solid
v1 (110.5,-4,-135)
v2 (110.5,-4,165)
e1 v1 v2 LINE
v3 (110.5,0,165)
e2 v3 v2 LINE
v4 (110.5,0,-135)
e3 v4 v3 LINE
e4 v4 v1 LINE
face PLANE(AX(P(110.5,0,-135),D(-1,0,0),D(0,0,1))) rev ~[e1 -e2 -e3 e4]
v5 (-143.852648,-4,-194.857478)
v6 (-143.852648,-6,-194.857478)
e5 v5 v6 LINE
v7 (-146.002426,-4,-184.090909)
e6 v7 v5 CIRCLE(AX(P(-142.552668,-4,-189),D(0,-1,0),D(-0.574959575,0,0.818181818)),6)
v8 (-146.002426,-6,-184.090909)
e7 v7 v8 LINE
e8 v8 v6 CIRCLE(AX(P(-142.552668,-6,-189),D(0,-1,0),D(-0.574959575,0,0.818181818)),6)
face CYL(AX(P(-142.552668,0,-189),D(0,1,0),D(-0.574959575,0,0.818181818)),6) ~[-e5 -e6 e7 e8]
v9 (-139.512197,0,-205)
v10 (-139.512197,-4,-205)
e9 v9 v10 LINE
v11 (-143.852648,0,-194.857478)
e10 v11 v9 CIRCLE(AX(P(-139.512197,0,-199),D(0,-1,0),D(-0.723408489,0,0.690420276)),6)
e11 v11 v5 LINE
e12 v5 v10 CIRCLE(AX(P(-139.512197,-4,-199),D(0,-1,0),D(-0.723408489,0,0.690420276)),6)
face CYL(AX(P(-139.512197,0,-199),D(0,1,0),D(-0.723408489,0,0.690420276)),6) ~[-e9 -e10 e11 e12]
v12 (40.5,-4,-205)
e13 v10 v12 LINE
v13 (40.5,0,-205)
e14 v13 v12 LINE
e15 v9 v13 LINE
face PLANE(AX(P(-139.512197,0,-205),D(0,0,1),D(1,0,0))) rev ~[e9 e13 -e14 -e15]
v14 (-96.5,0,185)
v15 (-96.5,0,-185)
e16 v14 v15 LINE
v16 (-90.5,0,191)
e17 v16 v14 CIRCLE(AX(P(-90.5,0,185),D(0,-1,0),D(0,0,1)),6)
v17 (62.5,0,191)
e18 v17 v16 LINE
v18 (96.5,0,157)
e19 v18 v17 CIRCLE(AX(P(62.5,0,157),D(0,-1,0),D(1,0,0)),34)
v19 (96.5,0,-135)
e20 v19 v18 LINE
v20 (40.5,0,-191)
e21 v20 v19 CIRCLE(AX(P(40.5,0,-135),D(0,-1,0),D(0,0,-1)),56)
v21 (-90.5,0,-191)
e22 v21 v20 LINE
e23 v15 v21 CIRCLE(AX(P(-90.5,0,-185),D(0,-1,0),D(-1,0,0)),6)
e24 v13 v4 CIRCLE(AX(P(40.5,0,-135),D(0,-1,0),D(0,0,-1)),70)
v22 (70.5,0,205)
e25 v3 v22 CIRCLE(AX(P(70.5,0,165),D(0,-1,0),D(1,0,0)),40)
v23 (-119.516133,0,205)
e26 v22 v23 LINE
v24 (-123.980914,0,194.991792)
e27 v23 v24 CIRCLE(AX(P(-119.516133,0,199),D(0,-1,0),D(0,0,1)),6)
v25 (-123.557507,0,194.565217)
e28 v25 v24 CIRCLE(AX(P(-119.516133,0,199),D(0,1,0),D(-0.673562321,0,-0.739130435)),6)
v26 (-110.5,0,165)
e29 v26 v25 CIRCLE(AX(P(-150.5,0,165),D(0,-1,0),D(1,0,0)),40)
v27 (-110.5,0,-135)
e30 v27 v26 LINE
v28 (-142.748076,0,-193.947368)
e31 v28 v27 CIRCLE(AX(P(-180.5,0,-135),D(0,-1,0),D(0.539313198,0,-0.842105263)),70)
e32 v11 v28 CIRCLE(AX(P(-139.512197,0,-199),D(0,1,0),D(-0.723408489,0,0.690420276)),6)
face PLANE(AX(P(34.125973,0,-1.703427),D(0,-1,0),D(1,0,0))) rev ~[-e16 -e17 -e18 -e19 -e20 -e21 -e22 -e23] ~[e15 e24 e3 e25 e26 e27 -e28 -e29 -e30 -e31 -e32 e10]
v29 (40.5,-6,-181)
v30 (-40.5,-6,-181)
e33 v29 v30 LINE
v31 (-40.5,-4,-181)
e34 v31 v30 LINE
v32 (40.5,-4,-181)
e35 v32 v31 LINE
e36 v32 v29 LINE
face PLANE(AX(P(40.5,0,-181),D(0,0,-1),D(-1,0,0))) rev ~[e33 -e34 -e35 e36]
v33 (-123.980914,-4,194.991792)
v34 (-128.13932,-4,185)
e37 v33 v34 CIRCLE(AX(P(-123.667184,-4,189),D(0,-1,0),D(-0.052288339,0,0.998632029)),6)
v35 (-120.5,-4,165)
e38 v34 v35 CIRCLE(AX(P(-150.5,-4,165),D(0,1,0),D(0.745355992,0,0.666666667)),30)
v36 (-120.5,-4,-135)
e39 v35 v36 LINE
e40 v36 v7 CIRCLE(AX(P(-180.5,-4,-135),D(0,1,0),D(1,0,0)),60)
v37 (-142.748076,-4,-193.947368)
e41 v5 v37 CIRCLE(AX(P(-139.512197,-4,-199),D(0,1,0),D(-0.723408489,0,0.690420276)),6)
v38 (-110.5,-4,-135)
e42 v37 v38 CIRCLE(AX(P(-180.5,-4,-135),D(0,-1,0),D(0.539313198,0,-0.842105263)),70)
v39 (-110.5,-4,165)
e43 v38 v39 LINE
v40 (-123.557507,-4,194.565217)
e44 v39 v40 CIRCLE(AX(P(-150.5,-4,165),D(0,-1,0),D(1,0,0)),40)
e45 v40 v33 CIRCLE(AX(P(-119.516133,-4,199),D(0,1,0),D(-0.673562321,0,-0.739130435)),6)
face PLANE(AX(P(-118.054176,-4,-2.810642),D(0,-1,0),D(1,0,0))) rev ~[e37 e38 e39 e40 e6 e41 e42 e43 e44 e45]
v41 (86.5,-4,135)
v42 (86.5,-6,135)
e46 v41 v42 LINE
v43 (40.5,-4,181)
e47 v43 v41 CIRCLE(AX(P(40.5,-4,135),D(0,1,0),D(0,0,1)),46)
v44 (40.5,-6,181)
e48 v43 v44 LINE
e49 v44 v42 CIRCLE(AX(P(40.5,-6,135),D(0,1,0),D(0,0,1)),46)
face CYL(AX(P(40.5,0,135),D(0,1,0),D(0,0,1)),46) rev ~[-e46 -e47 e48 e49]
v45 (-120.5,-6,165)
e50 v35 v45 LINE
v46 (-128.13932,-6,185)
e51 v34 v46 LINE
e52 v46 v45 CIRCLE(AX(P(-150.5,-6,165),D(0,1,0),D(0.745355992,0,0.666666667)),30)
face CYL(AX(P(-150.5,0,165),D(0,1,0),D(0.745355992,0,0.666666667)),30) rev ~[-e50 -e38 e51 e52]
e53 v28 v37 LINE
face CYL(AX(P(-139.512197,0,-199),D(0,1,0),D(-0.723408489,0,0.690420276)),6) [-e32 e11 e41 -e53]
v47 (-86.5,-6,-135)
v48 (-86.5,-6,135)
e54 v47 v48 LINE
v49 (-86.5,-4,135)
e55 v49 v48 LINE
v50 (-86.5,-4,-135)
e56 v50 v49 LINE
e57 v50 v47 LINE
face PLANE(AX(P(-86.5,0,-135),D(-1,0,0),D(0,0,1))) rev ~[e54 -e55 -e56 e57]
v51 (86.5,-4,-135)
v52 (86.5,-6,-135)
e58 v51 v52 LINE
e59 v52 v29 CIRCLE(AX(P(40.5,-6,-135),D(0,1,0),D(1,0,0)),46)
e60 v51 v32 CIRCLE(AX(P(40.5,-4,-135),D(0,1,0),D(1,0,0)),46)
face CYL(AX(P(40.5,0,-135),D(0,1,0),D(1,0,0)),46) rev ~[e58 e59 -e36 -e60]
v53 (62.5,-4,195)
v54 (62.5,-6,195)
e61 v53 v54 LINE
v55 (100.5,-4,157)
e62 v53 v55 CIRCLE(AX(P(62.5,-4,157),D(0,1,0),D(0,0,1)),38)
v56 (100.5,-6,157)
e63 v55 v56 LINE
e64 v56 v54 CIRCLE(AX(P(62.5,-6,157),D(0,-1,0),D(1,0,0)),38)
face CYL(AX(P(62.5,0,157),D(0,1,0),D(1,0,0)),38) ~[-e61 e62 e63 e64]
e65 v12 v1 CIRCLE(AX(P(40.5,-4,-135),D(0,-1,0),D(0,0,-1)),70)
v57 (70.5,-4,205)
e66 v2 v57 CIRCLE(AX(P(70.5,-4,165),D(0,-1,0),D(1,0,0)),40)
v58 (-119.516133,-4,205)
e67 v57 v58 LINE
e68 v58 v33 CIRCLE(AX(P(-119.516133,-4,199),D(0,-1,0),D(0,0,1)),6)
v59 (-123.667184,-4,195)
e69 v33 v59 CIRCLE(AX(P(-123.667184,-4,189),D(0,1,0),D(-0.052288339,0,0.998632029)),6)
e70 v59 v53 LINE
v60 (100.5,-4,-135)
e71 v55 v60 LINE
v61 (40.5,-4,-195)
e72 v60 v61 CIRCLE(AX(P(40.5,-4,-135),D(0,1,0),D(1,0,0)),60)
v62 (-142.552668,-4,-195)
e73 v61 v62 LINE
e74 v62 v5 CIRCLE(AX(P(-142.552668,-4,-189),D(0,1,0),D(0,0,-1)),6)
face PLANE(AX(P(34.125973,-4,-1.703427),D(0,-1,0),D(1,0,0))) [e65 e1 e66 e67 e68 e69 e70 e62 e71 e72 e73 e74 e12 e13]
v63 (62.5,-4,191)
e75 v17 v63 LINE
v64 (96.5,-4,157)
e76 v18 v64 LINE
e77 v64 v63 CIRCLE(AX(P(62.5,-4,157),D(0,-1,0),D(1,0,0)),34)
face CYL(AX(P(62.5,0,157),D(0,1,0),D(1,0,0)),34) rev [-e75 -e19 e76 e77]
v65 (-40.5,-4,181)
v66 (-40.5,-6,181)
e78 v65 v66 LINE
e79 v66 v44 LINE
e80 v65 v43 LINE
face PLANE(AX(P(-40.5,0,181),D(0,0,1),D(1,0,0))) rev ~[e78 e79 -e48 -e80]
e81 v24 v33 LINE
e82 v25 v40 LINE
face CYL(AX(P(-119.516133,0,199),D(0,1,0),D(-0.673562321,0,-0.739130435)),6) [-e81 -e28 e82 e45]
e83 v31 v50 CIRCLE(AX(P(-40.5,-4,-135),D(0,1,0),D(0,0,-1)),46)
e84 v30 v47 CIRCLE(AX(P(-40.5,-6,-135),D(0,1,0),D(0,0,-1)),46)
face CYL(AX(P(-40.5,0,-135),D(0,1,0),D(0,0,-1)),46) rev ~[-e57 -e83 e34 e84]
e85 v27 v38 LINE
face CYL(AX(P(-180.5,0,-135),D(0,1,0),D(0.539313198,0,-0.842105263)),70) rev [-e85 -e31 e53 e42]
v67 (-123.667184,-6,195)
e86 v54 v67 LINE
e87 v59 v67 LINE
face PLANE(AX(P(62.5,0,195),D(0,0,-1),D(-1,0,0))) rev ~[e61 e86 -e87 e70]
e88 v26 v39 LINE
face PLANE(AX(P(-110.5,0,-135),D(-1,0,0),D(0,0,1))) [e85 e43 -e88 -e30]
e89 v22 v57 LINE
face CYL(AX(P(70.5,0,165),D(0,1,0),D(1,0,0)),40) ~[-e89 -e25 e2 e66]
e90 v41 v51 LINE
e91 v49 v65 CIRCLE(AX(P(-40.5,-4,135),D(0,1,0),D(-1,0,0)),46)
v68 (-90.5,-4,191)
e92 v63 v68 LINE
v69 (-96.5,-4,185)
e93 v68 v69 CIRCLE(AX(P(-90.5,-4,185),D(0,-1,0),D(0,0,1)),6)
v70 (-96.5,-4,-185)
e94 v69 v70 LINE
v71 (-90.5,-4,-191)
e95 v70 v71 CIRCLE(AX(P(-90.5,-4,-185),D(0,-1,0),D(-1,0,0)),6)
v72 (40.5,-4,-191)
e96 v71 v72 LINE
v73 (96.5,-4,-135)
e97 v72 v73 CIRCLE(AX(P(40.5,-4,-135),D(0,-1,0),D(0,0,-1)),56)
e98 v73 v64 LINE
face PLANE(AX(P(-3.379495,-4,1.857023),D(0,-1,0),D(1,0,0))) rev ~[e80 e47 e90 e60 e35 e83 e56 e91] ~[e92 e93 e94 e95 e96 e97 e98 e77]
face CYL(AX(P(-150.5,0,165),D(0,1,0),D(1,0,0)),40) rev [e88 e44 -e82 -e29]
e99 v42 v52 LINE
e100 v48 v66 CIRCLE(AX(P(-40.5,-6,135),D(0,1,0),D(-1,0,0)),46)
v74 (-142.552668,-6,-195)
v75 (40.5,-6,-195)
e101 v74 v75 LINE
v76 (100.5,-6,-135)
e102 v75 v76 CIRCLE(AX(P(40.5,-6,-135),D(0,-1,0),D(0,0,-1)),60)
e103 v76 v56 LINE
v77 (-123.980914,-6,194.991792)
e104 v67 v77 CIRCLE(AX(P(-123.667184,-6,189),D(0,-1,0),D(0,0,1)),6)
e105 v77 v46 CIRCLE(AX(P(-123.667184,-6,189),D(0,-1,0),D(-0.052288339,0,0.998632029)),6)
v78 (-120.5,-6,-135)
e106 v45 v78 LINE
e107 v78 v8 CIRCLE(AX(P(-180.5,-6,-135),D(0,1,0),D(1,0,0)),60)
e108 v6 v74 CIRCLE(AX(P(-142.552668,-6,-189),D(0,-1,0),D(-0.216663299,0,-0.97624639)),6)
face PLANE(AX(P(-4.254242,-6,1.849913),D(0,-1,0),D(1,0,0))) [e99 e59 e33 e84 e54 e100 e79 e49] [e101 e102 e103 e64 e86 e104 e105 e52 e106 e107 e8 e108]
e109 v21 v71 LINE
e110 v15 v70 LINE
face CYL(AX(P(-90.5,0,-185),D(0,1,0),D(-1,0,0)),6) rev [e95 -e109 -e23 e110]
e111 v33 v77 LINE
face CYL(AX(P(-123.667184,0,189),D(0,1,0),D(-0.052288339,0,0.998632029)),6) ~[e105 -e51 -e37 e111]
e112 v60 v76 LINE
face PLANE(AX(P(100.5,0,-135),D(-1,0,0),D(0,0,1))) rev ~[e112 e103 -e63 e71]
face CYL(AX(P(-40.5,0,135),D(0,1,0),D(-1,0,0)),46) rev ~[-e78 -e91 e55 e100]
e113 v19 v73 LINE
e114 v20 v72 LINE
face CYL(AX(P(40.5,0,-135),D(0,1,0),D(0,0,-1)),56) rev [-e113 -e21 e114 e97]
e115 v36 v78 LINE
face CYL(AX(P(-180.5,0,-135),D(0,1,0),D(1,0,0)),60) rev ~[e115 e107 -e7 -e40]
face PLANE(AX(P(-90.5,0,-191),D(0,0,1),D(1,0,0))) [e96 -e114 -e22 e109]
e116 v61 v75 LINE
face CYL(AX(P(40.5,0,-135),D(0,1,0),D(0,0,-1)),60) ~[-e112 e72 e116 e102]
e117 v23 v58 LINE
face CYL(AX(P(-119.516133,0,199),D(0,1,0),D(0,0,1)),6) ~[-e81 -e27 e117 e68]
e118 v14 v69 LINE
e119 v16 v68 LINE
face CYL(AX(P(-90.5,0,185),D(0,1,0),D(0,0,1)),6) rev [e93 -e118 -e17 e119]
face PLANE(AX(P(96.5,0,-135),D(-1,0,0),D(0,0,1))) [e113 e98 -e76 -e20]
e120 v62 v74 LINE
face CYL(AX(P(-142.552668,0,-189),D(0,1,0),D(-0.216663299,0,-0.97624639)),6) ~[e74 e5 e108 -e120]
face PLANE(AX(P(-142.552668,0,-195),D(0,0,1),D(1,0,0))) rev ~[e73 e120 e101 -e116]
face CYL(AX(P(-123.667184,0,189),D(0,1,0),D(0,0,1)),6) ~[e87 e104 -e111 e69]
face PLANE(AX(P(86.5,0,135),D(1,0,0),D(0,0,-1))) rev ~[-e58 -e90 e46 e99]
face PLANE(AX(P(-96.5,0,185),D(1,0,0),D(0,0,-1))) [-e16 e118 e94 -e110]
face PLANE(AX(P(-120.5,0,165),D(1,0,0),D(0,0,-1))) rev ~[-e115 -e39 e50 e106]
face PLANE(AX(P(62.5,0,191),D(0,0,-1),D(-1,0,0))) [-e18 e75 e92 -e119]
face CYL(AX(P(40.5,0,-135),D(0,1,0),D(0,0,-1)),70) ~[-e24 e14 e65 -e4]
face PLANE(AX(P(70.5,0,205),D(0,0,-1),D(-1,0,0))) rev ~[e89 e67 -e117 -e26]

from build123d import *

# Parameters (mm, degrees)
F1_DEPTH = 6
F2_DEPTH = 4
F3_DEPTH = 4
F4_DEPTH = 4


# Not quite as in the source:
# - a feature names something its author has since deleted; it is built from what else it names


with BuildPart() as f1:
    # F0 (on Front) → F1 (new body)
    with BuildSketch(Plane.XZ):
        with BuildLine():
            Line((-100.5, 195), (-100.5, -195))
            Line((-100.5, -195), (-40.5, -195))
            Line((-40.5, -195), (40.5, -195))
            ThreePointArc((40.5, -195), (82.9264068712, -177.4264068712), (100.5, -135))
            Line((100.5, -135), (100.5, 157))
            ThreePointArc((100.5, 157), (89.3700576851, 183.8700576851), (62.5, 195))
            Line((62.5, 195), (-100.5, 195))
        make_face()
        with BuildLine():
            Line((96.5, 157), (96.5, -135))
            ThreePointArc((96.5, -135), (80.0979797464, -174.5979797464), (40.5, -191))
            Line((40.5, -191), (-90.5, -191))
            ThreePointArc((-90.5, -191), (-94.7426406871, -189.2426406871), (-96.5, -185))
            Line((-96.5, -185), (-96.5, 185))
            ThreePointArc((-96.5, 185), (-94.7426406871, 189.2426406871), (-90.5, 191))
            Line((-90.5, 191), (62.5, 191))
            ThreePointArc((62.5, 191), (86.5416305603, 181.0416305603), (96.5, 157))
        make_face(mode=Mode.SUBTRACT)
        with BuildLine():
            ThreePointArc((-142.7480761254, -193.9473684211), (-143.3275959396, -194.3693704052), (-143.8526478713, -194.8574783429))
            ThreePointArc((-143.8526478713, -194.8574783429), (-143.2065526025, -194.9642631589), (-142.552668078, -195))
            Line((-142.552668078, -195), (-100.5, -195))
            Line((-100.5, -195), (-100.5, 195))
            Line((-100.5, 195), (-123.66718427, 195))
            ThreePointArc((-123.66718427, 195), (-123.8241029609, 194.9979476927), (-123.9809143034, 194.9917921748))
            ThreePointArc((-123.9809143034, 194.9917921748), (-123.7745554417, 194.7731997599), (-123.5575071568, 194.5652173913))
            ThreePointArc((-123.5575071568, 194.5652173913), (-113.9097026951, 181.1601405667), (-110.5, 165))
            Line((-110.5, 165), (-110.5, -135))
            ThreePointArc((-110.5, -135), (-119.0889477731, -168.5958727285), (-142.7480761254, -193.9473684211))
        make_face()
        with BuildLine():
            ThreePointArc((-146.0024255254, -184.0909090909), (-148.4365234746, -190.1748385726), (-143.8526478713, -194.8574783429))
            ThreePointArc((-143.8526478713, -194.8574783429), (-143.3275959396, -194.3693704052), (-142.7480761254, -193.9473684211))
            ThreePointArc((-142.7480761254, -193.9473684211), (-119.0889477731, -168.5958727285), (-110.5, -135))
            Line((-110.5, -135), (-110.5, 165))
            ThreePointArc((-110.5, 165), (-113.9097026951, 181.1601405667), (-123.5575071568, 194.5652173913))
            ThreePointArc((-123.5575071568, 194.5652173913), (-123.7745554417, 194.7731997599), (-123.9809143034, 194.9917921748))
            ThreePointArc((-123.9809143034, 194.9917921748), (-129.2065981407, 191.3054053807), (-128.139320225, 185))
            ThreePointArc((-128.139320225, 185), (-122.4748292311, 175.7046626932), (-120.5, 165))
            Line((-120.5, 165), (-120.5, -135))
            ThreePointArc((-120.5, -135), (-127.2559652709, -162.6599487665), (-146.0024255254, -184.0909090909))
        make_face()
        with BuildLine():
            ThreePointArc((40.5, -191), (80.0979797464, -174.5979797464), (96.5, -135))
            Line((96.5, -135), (96.5, 157))
            ThreePointArc((96.5, 157), (86.5416305603, 181.0416305603), (62.5, 191))
            Line((62.5, 191), (-90.5, 191))
            ThreePointArc((-90.5, 191), (-94.7426406871, 189.2426406871), (-96.5, 185))
            Line((-96.5, 185), (-96.5, -185))
            ThreePointArc((-96.5, -185), (-94.7426406871, -189.2426406871), (-90.5, -191))
            Line((-90.5, -191), (40.5, -191))
        make_face()
        with BuildLine():
            Line((86.5, 135), (86.5, -135))
            ThreePointArc((86.5, -135), (73.0269119346, -167.5269119346), (40.5, -181))
            Line((40.5, -181), (-40.5, -181))
            ThreePointArc((-40.5, -181), (-73.0269119346, -167.5269119346), (-86.5, -135))
            Line((-86.5, -135), (-86.5, 135))
            ThreePointArc((-86.5, 135), (-73.0269119346, 167.5269119346), (-40.5, 181))
            Line((-40.5, 181), (40.5, 181))
            ThreePointArc((40.5, 181), (73.0269119346, 167.5269119346), (86.5, 135))
        make_face(mode=Mode.SUBTRACT)
    extrude(amount=F1_DEPTH)

    # F0 (on Front) → F2 (join)
    with BuildSketch(Plane.XZ):
        with BuildLine():
            Line((-110.5, -205), (40.5, -205))
            ThreePointArc((40.5, -205), (89.9974746831, -184.4974746831), (110.5, -135))
            Line((110.5, -135), (110.5, 165))
            ThreePointArc((110.5, 165), (98.7842712475, 193.2842712475), (70.5, 205))
            Line((70.5, 205), (-110.5, 205))
            Line((-110.5, 205), (-119.5161332303, 205))
            ThreePointArc((-119.5161332303, 205), (-124.9956061498, 201.4444583295), (-123.9809143034, 194.9917921748))
            ThreePointArc((-123.9809143034, 194.9917921748), (-123.8241029609, 194.9979476927), (-123.66718427, 195))
            Line((-123.66718427, 195), (-100.5, 195))
            Line((-100.5, 195), (62.5, 195))
            ThreePointArc((62.5, 195), (89.3700576851, 183.8700576851), (100.5, 157))
            Line((100.5, 157), (100.5, -135))
            ThreePointArc((100.5, -135), (82.9264068712, -177.4264068712), (40.5, -195))
            Line((40.5, -195), (-40.5, -195))
            Line((-40.5, -195), (-100.5, -195))
            Line((-100.5, -195), (-142.552668078, -195))
            ThreePointArc((-142.552668078, -195), (-143.2065526025, -194.9642631589), (-143.8526478713, -194.8574783429))
            ThreePointArc((-143.8526478713, -194.8574783429), (-145.0283155871, -201.3606005652), (-139.5121969362, -205))
            Line((-139.5121969362, -205), (-110.5, -205))
        make_face()
    extrude(amount=F2_DEPTH)

    # F0 (on Front) → F3 (cut)
    with BuildSketch(Plane.XZ):
        with BuildLine():
            ThreePointArc((-146.0024255254, -184.0909090909), (-148.4365234746, -190.1748385726), (-143.8526478713, -194.8574783429))
            ThreePointArc((-143.8526478713, -194.8574783429), (-143.3275959396, -194.3693704052), (-142.7480761254, -193.9473684211))
            ThreePointArc((-142.7480761254, -193.9473684211), (-119.0889477731, -168.5958727285), (-110.5, -135))
            Line((-110.5, -135), (-110.5, 165))
            ThreePointArc((-110.5, 165), (-113.9097026951, 181.1601405667), (-123.5575071568, 194.5652173913))
            ThreePointArc((-123.5575071568, 194.5652173913), (-123.7745554417, 194.7731997599), (-123.9809143034, 194.9917921748))
            ThreePointArc((-123.9809143034, 194.9917921748), (-129.2065981407, 191.3054053807), (-128.139320225, 185))
            ThreePointArc((-128.139320225, 185), (-122.4748292311, 175.7046626932), (-120.5, 165))
            Line((-120.5, 165), (-120.5, -135))
            ThreePointArc((-120.5, -135), (-127.2559652709, -162.6599487665), (-146.0024255254, -184.0909090909))
        make_face()
    extrude(amount=F3_DEPTH, mode=Mode.SUBTRACT)

    # F0 (on Front) → F4 (cut)
    with BuildSketch(Plane.XZ):
        with BuildLine():
            ThreePointArc((40.5, -191), (80.0979797464, -174.5979797464), (96.5, -135))
            Line((96.5, -135), (96.5, 157))
            ThreePointArc((96.5, 157), (86.5416305603, 181.0416305603), (62.5, 191))
            Line((62.5, 191), (-90.5, 191))
            ThreePointArc((-90.5, 191), (-94.7426406871, 189.2426406871), (-96.5, 185))
            Line((-96.5, 185), (-96.5, -185))
            ThreePointArc((-96.5, -185), (-94.7426406871, -189.2426406871), (-90.5, -191))
            Line((-90.5, -191), (40.5, -191))
        make_face()
        with BuildLine():
            Line((86.5, 135), (86.5, -135))
            ThreePointArc((86.5, -135), (73.0269119346, -167.5269119346), (40.5, -181))
            Line((40.5, -181), (-40.5, -181))
            ThreePointArc((-40.5, -181), (-73.0269119346, -167.5269119346), (-86.5, -135))
            Line((-86.5, -135), (-86.5, 135))
            ThreePointArc((-86.5, 135), (-73.0269119346, 167.5269119346), (-40.5, 181))
            Line((-40.5, 181), (40.5, 181))
            ThreePointArc((40.5, 181), (73.0269119346, 167.5269119346), (86.5, 135))
        make_face(mode=Mode.SUBTRACT)
    extrude(amount=F4_DEPTH, mode=Mode.SUBTRACT)


solid = f1.part
